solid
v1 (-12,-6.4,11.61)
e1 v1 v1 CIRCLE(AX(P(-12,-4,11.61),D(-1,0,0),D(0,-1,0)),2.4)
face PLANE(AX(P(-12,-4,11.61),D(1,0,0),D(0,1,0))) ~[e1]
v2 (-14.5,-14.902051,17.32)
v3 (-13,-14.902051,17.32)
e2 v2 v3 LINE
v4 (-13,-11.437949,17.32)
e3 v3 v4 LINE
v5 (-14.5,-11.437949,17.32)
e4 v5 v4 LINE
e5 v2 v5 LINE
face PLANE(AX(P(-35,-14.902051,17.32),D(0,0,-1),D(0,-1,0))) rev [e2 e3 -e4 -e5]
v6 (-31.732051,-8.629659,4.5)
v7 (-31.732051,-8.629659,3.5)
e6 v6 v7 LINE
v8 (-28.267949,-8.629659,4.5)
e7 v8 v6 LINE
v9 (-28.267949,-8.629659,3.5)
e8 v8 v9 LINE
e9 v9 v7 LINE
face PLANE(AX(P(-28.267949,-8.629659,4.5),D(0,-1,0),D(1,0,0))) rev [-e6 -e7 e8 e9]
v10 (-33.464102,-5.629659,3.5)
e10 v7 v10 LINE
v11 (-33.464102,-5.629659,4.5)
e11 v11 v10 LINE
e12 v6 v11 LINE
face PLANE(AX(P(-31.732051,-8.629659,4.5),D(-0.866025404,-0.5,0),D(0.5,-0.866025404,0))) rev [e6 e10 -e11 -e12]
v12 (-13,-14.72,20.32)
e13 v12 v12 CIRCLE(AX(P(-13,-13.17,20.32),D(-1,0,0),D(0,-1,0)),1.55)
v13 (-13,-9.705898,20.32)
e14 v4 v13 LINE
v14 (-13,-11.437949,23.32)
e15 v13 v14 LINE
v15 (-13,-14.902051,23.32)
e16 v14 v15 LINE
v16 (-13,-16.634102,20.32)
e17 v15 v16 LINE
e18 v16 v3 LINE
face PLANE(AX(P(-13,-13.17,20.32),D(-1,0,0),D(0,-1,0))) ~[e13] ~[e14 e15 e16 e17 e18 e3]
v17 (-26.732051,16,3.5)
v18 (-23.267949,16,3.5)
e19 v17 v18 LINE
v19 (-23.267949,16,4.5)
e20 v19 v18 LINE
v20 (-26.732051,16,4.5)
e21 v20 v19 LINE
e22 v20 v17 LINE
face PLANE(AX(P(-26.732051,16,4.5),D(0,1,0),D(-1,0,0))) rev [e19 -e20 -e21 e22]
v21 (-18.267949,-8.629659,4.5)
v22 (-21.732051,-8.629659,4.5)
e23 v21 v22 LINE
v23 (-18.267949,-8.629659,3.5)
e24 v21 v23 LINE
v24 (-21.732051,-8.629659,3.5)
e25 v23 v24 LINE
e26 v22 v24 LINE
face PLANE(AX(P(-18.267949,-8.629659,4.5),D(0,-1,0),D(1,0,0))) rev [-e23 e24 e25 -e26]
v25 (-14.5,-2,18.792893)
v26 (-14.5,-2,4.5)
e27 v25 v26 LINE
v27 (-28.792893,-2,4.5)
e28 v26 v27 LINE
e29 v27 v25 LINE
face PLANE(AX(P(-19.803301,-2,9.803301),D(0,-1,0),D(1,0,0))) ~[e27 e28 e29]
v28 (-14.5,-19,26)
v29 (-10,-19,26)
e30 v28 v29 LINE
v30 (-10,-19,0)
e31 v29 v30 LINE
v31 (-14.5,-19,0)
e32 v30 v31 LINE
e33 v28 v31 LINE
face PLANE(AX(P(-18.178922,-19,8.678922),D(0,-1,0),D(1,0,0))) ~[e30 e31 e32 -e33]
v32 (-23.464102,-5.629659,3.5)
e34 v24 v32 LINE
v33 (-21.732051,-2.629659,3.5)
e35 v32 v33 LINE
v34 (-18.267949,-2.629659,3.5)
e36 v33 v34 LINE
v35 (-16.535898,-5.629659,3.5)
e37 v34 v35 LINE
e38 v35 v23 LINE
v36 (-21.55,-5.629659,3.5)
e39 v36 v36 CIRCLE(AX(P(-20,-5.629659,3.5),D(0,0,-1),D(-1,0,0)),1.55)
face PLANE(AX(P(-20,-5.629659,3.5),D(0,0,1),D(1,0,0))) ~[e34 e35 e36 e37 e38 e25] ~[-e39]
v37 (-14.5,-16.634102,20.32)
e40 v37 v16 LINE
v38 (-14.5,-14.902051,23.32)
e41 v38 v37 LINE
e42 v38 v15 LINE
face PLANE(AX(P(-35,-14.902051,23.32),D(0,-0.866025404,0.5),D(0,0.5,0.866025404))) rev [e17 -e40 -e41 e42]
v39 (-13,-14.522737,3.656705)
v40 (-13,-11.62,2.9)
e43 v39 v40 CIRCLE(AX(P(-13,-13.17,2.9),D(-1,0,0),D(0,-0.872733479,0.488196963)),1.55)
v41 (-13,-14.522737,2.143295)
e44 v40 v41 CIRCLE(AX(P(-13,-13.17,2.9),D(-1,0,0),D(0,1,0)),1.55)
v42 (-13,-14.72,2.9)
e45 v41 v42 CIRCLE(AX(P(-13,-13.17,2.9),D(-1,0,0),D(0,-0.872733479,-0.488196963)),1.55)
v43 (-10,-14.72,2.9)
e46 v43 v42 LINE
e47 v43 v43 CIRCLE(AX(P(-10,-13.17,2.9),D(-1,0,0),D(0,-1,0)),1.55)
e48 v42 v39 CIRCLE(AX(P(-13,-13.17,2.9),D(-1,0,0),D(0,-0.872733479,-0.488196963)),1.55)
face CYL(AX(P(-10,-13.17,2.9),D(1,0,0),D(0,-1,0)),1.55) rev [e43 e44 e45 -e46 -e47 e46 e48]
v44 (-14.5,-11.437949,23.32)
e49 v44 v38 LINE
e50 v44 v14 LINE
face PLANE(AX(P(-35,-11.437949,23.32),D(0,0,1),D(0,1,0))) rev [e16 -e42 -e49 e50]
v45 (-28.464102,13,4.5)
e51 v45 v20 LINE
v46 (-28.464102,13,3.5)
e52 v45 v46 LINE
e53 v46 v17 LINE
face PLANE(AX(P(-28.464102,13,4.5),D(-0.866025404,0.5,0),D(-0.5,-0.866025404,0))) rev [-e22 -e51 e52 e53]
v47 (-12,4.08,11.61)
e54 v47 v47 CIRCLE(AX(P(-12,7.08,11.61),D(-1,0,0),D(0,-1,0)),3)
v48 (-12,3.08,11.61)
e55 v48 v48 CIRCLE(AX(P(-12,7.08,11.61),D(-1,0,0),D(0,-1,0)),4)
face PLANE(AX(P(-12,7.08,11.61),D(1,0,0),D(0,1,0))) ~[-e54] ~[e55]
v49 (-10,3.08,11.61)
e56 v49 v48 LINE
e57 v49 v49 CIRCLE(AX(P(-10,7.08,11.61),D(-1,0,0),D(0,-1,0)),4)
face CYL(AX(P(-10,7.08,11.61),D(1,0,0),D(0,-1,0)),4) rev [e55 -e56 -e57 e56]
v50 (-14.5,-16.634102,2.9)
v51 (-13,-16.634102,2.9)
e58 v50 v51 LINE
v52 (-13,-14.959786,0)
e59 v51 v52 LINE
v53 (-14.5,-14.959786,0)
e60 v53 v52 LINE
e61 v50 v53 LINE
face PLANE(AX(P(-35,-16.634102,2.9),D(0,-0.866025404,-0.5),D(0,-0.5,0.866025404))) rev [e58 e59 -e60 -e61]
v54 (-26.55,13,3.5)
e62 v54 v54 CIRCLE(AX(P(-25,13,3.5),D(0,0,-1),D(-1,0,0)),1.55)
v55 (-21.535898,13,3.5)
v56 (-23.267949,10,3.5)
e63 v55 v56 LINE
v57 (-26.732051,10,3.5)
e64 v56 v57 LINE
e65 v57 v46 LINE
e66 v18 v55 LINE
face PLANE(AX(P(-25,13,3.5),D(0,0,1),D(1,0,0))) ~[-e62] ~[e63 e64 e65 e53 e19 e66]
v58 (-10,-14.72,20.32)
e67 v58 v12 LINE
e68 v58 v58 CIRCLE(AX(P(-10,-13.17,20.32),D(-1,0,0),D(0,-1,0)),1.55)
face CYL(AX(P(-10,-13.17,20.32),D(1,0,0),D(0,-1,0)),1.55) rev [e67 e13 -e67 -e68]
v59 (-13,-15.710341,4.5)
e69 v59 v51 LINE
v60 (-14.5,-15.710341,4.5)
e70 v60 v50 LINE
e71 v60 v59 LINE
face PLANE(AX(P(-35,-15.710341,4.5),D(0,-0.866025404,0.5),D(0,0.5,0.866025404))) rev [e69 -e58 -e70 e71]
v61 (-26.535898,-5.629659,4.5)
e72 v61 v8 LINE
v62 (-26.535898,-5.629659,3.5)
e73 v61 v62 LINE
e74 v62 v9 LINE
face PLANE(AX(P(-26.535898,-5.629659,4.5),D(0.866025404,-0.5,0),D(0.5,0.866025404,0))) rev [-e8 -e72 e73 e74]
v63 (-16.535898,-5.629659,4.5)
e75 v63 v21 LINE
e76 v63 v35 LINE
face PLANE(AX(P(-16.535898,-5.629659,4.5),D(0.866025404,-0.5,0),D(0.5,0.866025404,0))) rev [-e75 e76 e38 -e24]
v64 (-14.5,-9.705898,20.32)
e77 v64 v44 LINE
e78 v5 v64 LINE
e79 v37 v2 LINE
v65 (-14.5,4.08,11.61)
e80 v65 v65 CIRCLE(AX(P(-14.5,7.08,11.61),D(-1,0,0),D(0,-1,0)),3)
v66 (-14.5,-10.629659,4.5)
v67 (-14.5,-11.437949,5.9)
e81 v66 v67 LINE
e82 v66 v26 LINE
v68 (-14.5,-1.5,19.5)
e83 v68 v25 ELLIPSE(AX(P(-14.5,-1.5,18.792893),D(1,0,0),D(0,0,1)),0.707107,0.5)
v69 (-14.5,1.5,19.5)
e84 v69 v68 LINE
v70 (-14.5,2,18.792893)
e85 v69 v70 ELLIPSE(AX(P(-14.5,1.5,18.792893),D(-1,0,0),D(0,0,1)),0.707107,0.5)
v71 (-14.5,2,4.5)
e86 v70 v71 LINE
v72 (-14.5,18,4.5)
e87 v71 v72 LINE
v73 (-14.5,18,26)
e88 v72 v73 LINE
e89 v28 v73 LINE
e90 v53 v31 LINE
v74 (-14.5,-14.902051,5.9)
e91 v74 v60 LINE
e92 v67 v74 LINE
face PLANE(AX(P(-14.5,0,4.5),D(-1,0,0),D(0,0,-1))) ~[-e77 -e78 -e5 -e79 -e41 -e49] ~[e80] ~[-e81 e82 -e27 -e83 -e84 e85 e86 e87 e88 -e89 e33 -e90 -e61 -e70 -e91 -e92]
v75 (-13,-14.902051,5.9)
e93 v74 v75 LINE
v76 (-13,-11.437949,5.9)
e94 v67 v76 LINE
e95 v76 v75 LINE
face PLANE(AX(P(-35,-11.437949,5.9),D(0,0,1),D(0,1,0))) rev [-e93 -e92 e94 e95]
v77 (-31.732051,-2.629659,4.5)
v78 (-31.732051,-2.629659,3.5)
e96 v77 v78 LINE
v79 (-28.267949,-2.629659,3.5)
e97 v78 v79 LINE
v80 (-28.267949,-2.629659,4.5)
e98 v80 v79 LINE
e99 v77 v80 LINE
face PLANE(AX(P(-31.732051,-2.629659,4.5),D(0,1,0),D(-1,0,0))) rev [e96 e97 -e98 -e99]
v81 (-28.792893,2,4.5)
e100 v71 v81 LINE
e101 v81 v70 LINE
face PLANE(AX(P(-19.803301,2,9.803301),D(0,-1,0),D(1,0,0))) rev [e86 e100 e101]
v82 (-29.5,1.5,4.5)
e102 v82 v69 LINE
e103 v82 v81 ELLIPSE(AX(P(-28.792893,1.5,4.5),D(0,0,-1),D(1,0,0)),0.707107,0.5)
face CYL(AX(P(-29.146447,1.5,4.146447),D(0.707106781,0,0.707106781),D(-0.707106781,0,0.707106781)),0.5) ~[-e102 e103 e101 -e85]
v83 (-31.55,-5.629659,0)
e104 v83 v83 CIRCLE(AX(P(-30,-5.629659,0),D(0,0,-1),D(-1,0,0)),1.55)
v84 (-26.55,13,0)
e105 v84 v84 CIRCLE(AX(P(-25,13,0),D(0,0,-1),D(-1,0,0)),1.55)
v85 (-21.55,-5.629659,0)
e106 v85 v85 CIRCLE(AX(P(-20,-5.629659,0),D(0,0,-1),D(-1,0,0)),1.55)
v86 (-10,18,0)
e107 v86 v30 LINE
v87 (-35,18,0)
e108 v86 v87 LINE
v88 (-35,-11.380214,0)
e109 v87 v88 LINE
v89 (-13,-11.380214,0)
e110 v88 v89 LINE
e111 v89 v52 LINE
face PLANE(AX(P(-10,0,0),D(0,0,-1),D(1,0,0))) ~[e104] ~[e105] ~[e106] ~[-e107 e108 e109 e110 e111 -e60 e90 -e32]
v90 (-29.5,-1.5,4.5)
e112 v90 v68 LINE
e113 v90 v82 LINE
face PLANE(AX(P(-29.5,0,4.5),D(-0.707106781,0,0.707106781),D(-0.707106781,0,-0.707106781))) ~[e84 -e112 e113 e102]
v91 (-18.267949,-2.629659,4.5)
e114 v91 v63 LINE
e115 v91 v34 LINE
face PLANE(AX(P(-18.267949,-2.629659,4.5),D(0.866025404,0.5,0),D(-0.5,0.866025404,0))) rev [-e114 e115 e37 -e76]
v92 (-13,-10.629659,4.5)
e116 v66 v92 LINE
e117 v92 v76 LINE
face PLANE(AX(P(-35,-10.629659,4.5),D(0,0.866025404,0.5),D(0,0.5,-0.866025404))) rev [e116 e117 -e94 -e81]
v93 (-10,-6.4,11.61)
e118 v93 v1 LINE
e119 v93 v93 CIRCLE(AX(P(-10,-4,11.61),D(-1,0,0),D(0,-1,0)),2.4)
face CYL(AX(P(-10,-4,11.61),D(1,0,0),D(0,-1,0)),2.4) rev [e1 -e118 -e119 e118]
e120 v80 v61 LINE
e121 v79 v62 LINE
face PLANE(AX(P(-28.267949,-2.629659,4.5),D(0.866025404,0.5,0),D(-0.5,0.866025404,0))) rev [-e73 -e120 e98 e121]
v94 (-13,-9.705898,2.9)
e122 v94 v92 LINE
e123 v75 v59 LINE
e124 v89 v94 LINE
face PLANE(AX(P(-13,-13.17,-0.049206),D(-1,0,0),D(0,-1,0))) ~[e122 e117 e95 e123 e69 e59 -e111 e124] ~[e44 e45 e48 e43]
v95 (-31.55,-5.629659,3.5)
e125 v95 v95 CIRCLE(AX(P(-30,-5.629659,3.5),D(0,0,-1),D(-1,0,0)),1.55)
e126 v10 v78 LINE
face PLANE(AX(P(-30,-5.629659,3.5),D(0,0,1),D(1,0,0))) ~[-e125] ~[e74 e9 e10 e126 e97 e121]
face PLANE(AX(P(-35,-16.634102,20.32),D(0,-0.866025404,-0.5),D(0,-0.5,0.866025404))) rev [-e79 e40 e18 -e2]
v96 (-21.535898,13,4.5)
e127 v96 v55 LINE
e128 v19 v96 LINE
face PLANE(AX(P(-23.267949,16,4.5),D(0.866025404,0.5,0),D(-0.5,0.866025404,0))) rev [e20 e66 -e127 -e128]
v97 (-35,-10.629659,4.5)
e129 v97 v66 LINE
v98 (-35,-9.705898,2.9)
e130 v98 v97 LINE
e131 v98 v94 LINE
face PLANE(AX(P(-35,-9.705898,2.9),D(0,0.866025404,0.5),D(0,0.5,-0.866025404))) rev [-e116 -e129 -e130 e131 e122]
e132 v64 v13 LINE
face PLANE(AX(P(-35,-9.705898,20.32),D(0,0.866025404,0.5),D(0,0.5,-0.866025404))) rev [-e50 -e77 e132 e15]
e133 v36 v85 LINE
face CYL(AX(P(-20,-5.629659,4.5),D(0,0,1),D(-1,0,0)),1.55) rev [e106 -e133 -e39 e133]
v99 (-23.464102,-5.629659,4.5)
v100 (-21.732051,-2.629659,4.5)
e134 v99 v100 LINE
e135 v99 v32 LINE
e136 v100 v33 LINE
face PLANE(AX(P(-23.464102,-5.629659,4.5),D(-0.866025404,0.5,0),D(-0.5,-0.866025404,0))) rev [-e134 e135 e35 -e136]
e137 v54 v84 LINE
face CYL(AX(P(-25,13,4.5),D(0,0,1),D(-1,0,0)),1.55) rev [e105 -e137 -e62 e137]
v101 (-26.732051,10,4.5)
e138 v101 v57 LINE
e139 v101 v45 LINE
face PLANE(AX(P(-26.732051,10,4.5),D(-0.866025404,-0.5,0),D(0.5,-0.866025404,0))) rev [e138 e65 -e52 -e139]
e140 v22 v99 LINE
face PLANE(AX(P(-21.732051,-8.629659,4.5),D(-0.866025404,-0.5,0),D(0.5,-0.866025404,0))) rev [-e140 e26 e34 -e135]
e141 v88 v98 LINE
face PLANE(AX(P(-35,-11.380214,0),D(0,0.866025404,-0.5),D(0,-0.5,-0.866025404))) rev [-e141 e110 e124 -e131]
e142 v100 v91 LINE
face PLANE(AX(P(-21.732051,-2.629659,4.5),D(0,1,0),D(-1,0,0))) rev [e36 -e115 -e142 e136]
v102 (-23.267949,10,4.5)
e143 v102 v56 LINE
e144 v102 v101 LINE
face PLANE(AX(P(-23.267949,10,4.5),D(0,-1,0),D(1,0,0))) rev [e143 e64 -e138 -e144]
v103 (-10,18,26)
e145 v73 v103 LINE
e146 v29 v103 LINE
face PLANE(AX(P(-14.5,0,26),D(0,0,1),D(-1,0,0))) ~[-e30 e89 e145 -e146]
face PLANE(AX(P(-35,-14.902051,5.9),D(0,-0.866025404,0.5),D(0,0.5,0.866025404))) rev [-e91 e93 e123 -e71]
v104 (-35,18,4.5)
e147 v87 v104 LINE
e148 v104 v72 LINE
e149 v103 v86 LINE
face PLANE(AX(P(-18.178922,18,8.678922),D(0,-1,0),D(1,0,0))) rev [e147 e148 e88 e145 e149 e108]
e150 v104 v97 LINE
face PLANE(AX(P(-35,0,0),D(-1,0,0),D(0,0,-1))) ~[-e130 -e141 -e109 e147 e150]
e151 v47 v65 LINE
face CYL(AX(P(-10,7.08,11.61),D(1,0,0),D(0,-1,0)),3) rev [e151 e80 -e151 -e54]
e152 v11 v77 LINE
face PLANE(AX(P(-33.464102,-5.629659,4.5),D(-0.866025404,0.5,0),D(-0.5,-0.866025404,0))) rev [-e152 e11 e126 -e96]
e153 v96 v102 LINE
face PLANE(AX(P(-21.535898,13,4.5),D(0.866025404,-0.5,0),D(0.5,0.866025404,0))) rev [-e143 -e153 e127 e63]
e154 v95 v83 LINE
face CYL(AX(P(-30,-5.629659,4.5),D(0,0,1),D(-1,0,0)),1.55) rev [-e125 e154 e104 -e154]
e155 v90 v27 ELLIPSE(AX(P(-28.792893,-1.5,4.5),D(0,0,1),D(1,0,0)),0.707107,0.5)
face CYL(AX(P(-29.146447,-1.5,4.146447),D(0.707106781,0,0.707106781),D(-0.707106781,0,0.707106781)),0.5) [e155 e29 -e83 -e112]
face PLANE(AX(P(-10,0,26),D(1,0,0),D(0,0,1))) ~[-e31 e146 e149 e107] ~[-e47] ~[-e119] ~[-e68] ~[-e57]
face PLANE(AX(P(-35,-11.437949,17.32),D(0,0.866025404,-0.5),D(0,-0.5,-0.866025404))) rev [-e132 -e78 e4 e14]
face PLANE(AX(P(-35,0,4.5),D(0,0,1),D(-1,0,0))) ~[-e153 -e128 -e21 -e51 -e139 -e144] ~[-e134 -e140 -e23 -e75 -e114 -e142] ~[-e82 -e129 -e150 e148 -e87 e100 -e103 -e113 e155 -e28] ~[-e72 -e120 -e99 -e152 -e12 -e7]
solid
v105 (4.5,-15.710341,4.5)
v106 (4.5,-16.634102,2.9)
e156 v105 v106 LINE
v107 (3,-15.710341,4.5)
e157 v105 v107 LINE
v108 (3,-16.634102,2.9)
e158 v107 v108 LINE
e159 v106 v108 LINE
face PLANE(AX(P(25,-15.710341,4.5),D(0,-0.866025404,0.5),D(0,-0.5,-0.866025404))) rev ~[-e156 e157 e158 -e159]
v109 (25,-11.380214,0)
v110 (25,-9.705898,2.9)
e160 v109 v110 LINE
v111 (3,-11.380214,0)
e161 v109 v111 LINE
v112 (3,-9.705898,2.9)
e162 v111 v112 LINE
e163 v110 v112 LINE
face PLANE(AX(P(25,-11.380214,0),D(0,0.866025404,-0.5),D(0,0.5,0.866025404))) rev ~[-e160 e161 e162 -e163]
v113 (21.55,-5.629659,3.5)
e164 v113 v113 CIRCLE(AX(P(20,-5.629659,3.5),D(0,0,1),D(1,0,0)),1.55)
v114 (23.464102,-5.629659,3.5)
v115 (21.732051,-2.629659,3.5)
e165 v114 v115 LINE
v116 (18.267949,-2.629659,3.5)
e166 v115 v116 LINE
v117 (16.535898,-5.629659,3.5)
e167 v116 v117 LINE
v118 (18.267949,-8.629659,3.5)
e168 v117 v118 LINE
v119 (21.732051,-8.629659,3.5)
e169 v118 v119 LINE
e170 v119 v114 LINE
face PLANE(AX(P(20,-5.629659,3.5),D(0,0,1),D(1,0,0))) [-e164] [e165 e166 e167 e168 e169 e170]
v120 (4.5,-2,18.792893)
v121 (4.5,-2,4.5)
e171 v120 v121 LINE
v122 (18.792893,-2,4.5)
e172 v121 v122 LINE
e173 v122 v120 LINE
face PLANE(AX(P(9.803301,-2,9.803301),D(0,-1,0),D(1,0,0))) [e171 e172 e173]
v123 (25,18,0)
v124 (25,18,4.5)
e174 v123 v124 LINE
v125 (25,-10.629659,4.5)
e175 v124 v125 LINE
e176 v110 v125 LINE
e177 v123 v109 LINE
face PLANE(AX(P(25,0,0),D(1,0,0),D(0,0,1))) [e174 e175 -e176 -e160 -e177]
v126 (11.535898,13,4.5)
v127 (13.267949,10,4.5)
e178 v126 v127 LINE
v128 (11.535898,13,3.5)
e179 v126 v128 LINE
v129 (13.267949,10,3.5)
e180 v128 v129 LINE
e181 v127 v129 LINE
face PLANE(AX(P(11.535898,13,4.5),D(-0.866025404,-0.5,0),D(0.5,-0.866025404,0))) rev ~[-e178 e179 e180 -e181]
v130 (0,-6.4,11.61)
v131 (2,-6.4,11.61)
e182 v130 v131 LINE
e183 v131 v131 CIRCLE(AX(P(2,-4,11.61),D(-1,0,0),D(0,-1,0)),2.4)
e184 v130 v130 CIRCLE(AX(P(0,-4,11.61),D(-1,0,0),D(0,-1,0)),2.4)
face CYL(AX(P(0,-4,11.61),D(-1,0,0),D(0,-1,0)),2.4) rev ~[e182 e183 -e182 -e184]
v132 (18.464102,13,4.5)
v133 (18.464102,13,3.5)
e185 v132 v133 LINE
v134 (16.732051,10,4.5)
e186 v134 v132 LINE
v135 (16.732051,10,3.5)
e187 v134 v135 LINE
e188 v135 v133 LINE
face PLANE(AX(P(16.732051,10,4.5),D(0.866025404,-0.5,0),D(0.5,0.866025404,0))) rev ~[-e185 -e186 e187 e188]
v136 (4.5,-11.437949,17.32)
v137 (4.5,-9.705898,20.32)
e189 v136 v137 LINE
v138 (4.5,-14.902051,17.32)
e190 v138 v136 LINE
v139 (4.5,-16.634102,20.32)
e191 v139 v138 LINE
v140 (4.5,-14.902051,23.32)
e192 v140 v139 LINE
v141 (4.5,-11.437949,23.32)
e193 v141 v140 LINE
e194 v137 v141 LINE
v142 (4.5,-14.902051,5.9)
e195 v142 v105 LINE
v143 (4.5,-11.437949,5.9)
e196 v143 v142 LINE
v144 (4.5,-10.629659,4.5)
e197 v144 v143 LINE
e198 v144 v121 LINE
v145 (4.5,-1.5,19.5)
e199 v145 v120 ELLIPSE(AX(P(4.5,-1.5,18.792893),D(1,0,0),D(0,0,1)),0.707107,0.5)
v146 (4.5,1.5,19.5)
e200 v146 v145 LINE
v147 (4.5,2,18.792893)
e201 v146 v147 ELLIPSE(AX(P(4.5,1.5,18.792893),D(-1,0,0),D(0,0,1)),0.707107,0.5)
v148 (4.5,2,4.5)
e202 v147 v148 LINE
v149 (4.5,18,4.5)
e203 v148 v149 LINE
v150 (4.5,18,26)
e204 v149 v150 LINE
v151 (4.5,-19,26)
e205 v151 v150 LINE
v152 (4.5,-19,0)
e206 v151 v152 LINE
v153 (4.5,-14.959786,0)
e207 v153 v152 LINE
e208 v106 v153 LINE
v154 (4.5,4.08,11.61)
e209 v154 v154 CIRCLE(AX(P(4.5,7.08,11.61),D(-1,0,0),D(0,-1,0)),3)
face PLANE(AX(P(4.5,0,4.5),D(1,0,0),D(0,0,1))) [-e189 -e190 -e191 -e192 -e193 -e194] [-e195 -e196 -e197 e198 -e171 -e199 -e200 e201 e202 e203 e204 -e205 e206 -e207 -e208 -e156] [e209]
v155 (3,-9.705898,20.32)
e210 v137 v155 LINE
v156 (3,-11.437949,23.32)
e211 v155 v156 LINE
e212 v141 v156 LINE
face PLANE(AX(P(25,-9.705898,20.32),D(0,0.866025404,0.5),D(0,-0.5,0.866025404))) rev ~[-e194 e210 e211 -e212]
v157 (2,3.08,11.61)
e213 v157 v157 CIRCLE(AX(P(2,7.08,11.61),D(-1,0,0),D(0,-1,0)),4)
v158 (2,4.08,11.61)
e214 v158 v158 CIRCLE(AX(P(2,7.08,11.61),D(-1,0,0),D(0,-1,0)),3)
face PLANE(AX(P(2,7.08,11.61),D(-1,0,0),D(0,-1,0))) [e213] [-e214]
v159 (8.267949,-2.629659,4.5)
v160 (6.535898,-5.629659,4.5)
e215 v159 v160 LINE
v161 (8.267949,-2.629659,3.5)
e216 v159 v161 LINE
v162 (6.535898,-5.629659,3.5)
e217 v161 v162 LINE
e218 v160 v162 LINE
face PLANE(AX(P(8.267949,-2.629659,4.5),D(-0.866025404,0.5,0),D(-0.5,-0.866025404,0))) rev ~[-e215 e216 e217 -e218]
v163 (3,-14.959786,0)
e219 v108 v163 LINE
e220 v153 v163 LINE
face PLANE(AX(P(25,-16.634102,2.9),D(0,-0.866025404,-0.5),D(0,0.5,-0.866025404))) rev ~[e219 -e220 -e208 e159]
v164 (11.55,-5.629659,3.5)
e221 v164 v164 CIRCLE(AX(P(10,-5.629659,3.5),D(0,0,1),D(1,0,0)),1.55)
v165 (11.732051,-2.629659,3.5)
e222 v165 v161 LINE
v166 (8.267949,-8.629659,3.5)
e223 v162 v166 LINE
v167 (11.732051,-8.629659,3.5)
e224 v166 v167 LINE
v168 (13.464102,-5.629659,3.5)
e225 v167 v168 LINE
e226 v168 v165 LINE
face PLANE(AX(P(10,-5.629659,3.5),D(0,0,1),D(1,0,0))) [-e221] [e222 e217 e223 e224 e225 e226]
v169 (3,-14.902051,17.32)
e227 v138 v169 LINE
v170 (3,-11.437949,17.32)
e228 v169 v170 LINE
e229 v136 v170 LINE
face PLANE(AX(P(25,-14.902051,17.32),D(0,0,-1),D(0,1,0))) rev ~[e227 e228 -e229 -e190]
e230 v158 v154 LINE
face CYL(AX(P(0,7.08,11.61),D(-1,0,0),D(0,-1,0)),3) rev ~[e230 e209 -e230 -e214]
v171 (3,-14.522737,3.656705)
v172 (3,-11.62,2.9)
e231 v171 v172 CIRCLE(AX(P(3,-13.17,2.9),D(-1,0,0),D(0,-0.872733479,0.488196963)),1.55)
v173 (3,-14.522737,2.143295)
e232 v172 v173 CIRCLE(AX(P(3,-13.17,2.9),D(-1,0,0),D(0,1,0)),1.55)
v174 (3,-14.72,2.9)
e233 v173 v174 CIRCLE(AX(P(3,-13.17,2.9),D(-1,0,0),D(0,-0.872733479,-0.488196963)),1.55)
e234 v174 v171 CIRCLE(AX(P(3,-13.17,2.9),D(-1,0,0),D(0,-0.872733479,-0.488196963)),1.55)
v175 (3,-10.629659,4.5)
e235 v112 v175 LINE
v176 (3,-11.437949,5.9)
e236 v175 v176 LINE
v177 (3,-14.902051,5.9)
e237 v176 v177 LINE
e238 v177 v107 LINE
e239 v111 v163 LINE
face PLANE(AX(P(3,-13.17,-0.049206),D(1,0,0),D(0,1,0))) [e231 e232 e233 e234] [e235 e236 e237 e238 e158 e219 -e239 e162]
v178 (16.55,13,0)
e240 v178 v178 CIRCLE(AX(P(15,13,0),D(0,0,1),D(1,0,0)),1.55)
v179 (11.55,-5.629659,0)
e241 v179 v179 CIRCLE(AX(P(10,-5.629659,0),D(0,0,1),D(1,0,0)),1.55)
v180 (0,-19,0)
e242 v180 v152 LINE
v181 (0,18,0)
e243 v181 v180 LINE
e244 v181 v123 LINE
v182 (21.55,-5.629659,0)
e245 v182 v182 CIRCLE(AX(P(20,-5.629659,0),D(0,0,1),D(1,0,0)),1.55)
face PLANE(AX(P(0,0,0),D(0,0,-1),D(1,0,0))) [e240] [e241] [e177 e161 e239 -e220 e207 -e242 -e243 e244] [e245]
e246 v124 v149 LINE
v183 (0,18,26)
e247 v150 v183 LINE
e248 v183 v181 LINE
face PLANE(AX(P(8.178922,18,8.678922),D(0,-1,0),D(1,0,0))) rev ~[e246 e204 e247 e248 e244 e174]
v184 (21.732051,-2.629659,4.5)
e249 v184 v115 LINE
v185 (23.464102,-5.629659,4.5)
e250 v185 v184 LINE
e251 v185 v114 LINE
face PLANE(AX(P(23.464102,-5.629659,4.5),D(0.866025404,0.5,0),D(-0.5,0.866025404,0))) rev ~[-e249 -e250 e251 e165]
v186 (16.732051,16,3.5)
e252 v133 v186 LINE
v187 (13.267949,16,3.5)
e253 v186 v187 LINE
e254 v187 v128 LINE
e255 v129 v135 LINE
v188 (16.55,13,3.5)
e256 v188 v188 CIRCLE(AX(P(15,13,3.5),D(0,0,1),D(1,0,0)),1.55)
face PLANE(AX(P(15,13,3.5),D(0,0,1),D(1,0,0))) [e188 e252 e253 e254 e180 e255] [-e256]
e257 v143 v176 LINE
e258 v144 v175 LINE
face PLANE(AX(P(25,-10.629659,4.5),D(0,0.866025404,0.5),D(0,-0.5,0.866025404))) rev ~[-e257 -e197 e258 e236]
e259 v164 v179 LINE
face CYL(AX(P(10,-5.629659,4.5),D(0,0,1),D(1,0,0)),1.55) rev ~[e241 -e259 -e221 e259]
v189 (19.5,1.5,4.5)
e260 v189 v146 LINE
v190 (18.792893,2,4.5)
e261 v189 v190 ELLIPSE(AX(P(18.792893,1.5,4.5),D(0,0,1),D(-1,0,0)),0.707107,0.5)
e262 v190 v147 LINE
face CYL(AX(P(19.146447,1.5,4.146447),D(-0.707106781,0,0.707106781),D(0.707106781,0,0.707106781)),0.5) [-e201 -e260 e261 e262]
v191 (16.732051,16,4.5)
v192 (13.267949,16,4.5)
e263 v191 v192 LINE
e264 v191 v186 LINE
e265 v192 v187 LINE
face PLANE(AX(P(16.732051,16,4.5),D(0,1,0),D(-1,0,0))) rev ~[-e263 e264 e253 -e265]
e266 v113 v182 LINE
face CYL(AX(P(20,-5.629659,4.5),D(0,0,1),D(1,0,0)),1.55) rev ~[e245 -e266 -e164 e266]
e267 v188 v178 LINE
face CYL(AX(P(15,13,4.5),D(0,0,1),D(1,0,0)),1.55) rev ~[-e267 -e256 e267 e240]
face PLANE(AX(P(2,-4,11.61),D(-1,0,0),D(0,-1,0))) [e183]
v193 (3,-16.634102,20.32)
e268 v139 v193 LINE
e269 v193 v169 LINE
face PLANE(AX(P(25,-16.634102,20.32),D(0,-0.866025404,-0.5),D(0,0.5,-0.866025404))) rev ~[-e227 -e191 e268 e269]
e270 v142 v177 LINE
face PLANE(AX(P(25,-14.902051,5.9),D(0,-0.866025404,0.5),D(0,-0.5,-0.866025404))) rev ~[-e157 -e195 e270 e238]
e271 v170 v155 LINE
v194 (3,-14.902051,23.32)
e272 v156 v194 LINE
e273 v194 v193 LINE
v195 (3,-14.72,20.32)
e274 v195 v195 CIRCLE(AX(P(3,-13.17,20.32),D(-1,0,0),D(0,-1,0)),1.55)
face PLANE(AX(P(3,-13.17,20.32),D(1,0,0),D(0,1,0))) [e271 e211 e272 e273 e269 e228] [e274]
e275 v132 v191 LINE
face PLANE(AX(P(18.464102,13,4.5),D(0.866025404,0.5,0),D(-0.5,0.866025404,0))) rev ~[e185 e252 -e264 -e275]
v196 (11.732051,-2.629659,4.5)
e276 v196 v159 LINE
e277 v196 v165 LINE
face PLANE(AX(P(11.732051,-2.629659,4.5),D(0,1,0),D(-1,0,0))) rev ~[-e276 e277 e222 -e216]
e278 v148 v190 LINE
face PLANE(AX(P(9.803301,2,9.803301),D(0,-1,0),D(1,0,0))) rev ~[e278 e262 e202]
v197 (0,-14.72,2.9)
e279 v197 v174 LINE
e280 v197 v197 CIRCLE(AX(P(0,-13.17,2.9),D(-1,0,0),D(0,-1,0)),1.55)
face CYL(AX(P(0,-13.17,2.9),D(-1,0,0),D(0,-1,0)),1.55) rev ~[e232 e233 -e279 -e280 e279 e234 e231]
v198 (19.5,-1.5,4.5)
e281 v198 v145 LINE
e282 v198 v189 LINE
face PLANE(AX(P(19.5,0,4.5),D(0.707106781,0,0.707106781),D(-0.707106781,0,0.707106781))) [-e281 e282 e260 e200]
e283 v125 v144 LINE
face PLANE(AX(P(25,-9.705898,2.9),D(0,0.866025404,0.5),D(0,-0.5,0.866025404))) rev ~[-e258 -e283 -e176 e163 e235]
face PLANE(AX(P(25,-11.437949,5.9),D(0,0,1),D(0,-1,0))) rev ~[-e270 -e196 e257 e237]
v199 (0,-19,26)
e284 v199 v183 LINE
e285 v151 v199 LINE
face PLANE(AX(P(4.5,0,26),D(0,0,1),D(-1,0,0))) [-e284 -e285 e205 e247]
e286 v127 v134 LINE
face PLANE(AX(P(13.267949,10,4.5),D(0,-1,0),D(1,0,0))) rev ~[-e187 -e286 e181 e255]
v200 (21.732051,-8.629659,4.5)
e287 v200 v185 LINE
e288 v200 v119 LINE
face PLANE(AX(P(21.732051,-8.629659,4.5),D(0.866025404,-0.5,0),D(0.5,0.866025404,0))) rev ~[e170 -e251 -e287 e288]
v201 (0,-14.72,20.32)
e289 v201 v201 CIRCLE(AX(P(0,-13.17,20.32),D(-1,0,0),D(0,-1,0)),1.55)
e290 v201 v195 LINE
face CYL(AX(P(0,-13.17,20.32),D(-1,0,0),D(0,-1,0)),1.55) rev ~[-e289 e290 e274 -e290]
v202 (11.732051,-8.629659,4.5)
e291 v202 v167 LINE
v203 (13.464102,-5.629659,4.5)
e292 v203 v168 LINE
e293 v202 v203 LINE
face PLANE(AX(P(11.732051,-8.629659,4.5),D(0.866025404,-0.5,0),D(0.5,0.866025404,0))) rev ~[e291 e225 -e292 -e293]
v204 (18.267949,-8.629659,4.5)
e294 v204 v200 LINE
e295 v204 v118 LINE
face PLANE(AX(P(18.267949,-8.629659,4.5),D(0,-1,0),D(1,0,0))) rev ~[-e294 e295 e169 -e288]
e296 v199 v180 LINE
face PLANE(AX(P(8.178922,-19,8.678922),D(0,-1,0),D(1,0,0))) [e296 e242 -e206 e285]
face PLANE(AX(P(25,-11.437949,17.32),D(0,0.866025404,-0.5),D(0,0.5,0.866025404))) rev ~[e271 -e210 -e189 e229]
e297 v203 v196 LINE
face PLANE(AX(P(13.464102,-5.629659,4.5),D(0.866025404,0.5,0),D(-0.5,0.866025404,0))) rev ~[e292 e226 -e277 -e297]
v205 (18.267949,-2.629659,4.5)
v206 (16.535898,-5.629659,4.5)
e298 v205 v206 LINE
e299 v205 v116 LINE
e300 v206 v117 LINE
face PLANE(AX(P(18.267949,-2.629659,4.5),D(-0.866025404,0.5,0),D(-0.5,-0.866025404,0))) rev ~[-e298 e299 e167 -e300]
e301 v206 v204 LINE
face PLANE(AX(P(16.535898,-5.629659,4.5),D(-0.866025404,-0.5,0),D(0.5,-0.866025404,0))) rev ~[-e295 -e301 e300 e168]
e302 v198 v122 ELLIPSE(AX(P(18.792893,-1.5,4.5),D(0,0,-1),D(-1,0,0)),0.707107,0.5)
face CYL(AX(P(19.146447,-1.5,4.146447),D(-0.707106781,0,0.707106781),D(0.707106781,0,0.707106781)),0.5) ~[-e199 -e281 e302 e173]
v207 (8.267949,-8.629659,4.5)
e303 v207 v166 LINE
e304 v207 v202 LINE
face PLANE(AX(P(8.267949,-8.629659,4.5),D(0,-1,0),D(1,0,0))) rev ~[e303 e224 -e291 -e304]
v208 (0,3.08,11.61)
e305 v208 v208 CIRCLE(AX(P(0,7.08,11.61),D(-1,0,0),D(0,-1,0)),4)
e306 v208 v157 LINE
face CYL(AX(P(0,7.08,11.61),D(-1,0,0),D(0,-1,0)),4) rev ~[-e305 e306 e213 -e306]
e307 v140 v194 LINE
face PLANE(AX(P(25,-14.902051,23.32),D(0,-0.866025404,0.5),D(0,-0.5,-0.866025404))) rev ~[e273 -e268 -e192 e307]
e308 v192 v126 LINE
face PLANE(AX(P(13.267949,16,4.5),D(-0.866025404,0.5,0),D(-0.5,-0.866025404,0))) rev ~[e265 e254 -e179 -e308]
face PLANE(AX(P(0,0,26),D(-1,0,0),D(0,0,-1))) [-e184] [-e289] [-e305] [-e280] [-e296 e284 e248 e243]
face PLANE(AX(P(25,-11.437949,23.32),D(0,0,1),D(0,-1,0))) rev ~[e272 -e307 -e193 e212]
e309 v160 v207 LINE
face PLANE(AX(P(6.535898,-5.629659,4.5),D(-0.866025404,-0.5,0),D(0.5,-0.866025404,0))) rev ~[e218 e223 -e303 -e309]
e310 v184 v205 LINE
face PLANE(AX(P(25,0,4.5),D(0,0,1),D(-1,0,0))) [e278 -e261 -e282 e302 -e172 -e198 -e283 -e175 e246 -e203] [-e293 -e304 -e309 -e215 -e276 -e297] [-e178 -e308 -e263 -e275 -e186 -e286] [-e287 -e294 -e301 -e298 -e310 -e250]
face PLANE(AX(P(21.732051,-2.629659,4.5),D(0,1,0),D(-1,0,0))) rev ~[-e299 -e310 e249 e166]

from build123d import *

# Parameters (mm, degrees)
F1_DEPTH      = 19
F1_DEPTH_BACK = 18
F2_DEPTH      = 2
F2_DEPTH_BACK = 2
F3_R          = 1.55
F4_DEPTH      = 26
F6_DEPTH      = 22
F7_DEPTH      = 20.5
F8_R          = 1.55
F9_DEPTH      = 1
F10_DEPTH     = 6
F11_R         = 0.5
F3_R_2        = 3
F12_DEPTH     = 6
F3_R_3        = 4
F3_R_4        = 2.4
F13_DEPTH     = 2


with BuildPart() as f1:
    # F0 (on Front) → F1 (new body, two sides)
    with BuildSketch(Plane.XZ) as f1_sk:
        Polygon((0, 26), (0, 0), (25, 0), (25, 4.5), (19.5, 4.5), (4.5, 4.5), (4.5, 19.5), (4.5, 26), align=None)
    extrude(amount=F1_DEPTH)
    extrude(f1_sk.sketch, amount=-F1_DEPTH_BACK)

    # F0 (on Front) → F2 (join, two sides)
    with BuildSketch(Plane.XZ) as f2_sk:
        Polygon((19.5, 4.5), (4.5, 19.5), (4.5, 4.5), align=None)
    extrude(amount=F2_DEPTH)
    extrude(f2_sk.sketch, amount=-F2_DEPTH_BACK)

    # F3 (on face) → F4 (cut)
    with BuildSketch(Plane(origin=(0, 0, 0), x_dir=(0, -1, 0), z_dir=(-1, 0, 0))):
        with Locations((13.17, 2.9)):
            Circle(F3_R)
        with Locations((13.17, 20.32)):
            Circle(F3_R)
    extrude(amount=-F4_DEPTH, mode=Mode.SUBTRACT)

    # F5 (on face) → F6 (cut)
    with BuildSketch(Plane.YZ.offset(25)):
        Polygon((-14.9020508076, 17.32), (-11.4379491924, 17.32), (-9.7058983849, 20.32), (-11.4379491924, 23.32), (-14.9020508076, 23.32), (-16.6341016151, 20.32), align=None)
        Polygon((-14.9020508076, -0.1), (-11.4379491924, -0.1), (-11.3802141655, 0), (-14.5227368921, 0), (-14.9597858345, 0), align=None)
        Polygon((-14.5227368921, 4.5), (-10.6296588156, 4.5), (-11.4379491924, 5.9), (-14.9020508076, 5.9), (-15.7103411844, 4.5), align=None)
        with BuildLine():
            Line((-16.6341016151, 2.9), (-14.9597858345, 0))
            Line((-14.9597858345, 0), (-14.5227368921, 0))
            Line((-14.5227368921, 0), (-14.5227368921, 2.1432947068))
            ThreePointArc((-14.5227368921, 2.1432947068), (-14.72, 2.9), (-14.5227368921, 3.6567052932))
            Line((-14.5227368921, 3.6567052932), (-14.5227368921, 4.5))
            Line((-14.5227368921, 4.5), (-15.7103411844, 4.5))
            Line((-15.7103411844, 4.5), (-16.6341016151, 2.9))
        make_face()
        with BuildLine():
            Line((-14.5227368921, 0), (-11.3802141655, 0))
            Line((-11.3802141655, 0), (-9.7058983849, 2.9))
            Line((-9.7058983849, 2.9), (-10.6296588156, 4.5))
            Line((-10.6296588156, 4.5), (-14.5227368921, 4.5))
            Line((-14.5227368921, 4.5), (-14.5227368921, 3.6567052932))
            ThreePointArc((-14.5227368921, 3.6567052932), (-12.7790026744, 4.3998736918), (-11.62, 2.9))
            ThreePointArc((-11.62, 2.9), (-12.7790026744, 1.4001263082), (-14.5227368921, 2.1432947068))
            Line((-14.5227368921, 2.1432947068), (-14.5227368921, 0))
        make_face()
    extrude(amount=-F6_DEPTH, mode=Mode.SUBTRACT)

    # F7 (cut): a face of the model
    f7_faces = [f1.faces().sort_by_distance(p)[0] for p in [
        (25, -17.4312907, 2.1162889805),
    ]]
    extrude(f7_faces, amount=-F7_DEPTH, mode=Mode.SUBTRACT)

    # F8 (on face) → F9 (cut)
    with BuildSketch(Plane.XY.offset(4.5)):
        Polygon((8.2679491924, -8.6296588156), (11.7320508076, -8.6296588156), (13.4641016151, -5.6296588156), (11.7320508076, -2.6296588156), (8.2679491924, -2.6296588156), (6.5358983849, -5.6296588156), align=None)
        with Locations((10, -5.6296588156)):
            Circle(F8_R, mode=Mode.SUBTRACT)
        Polygon((18.2679491924, -8.6296588156), (21.7320508076, -8.6296588156), (23.4641016151, -5.6296588156), (21.7320508076, -2.6296588156), (18.2679491924, -2.6296588156), (16.5358983849, -5.6296588156), align=None)
        with Locations((20, -5.6296588156)):
            Circle(F8_R, mode=Mode.SUBTRACT)
        Polygon((16.7320508076, 16), (13.2679491924, 16), (11.5358983849, 13), (13.2679491924, 10), (16.7320508076, 10), (18.4641016151, 13), align=None)
        with Locations((15, 13)):
            Circle(F8_R, mode=Mode.SUBTRACT)
        with Locations((10, -5.6296588156)):
            Circle(F8_R)
        with Locations((20, -5.6296588156)):
            Circle(F8_R)
        with Locations((15, 13)):
            Circle(F8_R)
    extrude(amount=-F9_DEPTH, mode=Mode.SUBTRACT)

    # F8 (on face) → F10 (cut)
    with BuildSketch(Plane.XY.offset(4.5)):
        with Locations((10, -5.6296588156)):
            Circle(F8_R)
        with Locations((20, -5.6296588156)):
            Circle(F8_R)
        with Locations((15, 13)):
            Circle(F8_R)
    extrude(amount=-F10_DEPTH, mode=Mode.SUBTRACT)

    # F11
    f11_edges = [f1.edges().sort_by_distance(p)[0] for p in [
        (12, -2, 12),
        (12, 2, 12),
    ]]
    fillet(f11_edges, radius=F11_R)

    # F3 (on face) → F12 (cut)
    with BuildSketch(Plane(origin=(0, 0, 0), x_dir=(0, -1, 0), z_dir=(-1, 0, 0))):
        with Locations((-7.08, 11.61)):
            Circle(F3_R_2)
    extrude(amount=-F12_DEPTH, mode=Mode.SUBTRACT)

    # F3 (on face) → F13 (cut)
    with BuildSketch(Plane(origin=(0, 0, 0), x_dir=(0, -1, 0), z_dir=(-1, 0, 0))):
        with Locations((-7.08, 11.61)):
            Circle(F3_R_3)
        with Locations((-7.08, 11.61)):
            Circle(F3_R_2, mode=Mode.SUBTRACT)
        with Locations((4, 11.61)):
            Circle(F3_R_4)
    extrude(amount=-F13_DEPTH, mode=Mode.SUBTRACT)


with BuildPart() as f15_1:
    # F15: instance of F1
    add(f1.part.mirror(Plane(origin=(-5, 0, 0), x_dir=(0, -1, 0), z_dir=(-1, 0, 0))))


solid = Compound([f1.part, f15_1.part])
